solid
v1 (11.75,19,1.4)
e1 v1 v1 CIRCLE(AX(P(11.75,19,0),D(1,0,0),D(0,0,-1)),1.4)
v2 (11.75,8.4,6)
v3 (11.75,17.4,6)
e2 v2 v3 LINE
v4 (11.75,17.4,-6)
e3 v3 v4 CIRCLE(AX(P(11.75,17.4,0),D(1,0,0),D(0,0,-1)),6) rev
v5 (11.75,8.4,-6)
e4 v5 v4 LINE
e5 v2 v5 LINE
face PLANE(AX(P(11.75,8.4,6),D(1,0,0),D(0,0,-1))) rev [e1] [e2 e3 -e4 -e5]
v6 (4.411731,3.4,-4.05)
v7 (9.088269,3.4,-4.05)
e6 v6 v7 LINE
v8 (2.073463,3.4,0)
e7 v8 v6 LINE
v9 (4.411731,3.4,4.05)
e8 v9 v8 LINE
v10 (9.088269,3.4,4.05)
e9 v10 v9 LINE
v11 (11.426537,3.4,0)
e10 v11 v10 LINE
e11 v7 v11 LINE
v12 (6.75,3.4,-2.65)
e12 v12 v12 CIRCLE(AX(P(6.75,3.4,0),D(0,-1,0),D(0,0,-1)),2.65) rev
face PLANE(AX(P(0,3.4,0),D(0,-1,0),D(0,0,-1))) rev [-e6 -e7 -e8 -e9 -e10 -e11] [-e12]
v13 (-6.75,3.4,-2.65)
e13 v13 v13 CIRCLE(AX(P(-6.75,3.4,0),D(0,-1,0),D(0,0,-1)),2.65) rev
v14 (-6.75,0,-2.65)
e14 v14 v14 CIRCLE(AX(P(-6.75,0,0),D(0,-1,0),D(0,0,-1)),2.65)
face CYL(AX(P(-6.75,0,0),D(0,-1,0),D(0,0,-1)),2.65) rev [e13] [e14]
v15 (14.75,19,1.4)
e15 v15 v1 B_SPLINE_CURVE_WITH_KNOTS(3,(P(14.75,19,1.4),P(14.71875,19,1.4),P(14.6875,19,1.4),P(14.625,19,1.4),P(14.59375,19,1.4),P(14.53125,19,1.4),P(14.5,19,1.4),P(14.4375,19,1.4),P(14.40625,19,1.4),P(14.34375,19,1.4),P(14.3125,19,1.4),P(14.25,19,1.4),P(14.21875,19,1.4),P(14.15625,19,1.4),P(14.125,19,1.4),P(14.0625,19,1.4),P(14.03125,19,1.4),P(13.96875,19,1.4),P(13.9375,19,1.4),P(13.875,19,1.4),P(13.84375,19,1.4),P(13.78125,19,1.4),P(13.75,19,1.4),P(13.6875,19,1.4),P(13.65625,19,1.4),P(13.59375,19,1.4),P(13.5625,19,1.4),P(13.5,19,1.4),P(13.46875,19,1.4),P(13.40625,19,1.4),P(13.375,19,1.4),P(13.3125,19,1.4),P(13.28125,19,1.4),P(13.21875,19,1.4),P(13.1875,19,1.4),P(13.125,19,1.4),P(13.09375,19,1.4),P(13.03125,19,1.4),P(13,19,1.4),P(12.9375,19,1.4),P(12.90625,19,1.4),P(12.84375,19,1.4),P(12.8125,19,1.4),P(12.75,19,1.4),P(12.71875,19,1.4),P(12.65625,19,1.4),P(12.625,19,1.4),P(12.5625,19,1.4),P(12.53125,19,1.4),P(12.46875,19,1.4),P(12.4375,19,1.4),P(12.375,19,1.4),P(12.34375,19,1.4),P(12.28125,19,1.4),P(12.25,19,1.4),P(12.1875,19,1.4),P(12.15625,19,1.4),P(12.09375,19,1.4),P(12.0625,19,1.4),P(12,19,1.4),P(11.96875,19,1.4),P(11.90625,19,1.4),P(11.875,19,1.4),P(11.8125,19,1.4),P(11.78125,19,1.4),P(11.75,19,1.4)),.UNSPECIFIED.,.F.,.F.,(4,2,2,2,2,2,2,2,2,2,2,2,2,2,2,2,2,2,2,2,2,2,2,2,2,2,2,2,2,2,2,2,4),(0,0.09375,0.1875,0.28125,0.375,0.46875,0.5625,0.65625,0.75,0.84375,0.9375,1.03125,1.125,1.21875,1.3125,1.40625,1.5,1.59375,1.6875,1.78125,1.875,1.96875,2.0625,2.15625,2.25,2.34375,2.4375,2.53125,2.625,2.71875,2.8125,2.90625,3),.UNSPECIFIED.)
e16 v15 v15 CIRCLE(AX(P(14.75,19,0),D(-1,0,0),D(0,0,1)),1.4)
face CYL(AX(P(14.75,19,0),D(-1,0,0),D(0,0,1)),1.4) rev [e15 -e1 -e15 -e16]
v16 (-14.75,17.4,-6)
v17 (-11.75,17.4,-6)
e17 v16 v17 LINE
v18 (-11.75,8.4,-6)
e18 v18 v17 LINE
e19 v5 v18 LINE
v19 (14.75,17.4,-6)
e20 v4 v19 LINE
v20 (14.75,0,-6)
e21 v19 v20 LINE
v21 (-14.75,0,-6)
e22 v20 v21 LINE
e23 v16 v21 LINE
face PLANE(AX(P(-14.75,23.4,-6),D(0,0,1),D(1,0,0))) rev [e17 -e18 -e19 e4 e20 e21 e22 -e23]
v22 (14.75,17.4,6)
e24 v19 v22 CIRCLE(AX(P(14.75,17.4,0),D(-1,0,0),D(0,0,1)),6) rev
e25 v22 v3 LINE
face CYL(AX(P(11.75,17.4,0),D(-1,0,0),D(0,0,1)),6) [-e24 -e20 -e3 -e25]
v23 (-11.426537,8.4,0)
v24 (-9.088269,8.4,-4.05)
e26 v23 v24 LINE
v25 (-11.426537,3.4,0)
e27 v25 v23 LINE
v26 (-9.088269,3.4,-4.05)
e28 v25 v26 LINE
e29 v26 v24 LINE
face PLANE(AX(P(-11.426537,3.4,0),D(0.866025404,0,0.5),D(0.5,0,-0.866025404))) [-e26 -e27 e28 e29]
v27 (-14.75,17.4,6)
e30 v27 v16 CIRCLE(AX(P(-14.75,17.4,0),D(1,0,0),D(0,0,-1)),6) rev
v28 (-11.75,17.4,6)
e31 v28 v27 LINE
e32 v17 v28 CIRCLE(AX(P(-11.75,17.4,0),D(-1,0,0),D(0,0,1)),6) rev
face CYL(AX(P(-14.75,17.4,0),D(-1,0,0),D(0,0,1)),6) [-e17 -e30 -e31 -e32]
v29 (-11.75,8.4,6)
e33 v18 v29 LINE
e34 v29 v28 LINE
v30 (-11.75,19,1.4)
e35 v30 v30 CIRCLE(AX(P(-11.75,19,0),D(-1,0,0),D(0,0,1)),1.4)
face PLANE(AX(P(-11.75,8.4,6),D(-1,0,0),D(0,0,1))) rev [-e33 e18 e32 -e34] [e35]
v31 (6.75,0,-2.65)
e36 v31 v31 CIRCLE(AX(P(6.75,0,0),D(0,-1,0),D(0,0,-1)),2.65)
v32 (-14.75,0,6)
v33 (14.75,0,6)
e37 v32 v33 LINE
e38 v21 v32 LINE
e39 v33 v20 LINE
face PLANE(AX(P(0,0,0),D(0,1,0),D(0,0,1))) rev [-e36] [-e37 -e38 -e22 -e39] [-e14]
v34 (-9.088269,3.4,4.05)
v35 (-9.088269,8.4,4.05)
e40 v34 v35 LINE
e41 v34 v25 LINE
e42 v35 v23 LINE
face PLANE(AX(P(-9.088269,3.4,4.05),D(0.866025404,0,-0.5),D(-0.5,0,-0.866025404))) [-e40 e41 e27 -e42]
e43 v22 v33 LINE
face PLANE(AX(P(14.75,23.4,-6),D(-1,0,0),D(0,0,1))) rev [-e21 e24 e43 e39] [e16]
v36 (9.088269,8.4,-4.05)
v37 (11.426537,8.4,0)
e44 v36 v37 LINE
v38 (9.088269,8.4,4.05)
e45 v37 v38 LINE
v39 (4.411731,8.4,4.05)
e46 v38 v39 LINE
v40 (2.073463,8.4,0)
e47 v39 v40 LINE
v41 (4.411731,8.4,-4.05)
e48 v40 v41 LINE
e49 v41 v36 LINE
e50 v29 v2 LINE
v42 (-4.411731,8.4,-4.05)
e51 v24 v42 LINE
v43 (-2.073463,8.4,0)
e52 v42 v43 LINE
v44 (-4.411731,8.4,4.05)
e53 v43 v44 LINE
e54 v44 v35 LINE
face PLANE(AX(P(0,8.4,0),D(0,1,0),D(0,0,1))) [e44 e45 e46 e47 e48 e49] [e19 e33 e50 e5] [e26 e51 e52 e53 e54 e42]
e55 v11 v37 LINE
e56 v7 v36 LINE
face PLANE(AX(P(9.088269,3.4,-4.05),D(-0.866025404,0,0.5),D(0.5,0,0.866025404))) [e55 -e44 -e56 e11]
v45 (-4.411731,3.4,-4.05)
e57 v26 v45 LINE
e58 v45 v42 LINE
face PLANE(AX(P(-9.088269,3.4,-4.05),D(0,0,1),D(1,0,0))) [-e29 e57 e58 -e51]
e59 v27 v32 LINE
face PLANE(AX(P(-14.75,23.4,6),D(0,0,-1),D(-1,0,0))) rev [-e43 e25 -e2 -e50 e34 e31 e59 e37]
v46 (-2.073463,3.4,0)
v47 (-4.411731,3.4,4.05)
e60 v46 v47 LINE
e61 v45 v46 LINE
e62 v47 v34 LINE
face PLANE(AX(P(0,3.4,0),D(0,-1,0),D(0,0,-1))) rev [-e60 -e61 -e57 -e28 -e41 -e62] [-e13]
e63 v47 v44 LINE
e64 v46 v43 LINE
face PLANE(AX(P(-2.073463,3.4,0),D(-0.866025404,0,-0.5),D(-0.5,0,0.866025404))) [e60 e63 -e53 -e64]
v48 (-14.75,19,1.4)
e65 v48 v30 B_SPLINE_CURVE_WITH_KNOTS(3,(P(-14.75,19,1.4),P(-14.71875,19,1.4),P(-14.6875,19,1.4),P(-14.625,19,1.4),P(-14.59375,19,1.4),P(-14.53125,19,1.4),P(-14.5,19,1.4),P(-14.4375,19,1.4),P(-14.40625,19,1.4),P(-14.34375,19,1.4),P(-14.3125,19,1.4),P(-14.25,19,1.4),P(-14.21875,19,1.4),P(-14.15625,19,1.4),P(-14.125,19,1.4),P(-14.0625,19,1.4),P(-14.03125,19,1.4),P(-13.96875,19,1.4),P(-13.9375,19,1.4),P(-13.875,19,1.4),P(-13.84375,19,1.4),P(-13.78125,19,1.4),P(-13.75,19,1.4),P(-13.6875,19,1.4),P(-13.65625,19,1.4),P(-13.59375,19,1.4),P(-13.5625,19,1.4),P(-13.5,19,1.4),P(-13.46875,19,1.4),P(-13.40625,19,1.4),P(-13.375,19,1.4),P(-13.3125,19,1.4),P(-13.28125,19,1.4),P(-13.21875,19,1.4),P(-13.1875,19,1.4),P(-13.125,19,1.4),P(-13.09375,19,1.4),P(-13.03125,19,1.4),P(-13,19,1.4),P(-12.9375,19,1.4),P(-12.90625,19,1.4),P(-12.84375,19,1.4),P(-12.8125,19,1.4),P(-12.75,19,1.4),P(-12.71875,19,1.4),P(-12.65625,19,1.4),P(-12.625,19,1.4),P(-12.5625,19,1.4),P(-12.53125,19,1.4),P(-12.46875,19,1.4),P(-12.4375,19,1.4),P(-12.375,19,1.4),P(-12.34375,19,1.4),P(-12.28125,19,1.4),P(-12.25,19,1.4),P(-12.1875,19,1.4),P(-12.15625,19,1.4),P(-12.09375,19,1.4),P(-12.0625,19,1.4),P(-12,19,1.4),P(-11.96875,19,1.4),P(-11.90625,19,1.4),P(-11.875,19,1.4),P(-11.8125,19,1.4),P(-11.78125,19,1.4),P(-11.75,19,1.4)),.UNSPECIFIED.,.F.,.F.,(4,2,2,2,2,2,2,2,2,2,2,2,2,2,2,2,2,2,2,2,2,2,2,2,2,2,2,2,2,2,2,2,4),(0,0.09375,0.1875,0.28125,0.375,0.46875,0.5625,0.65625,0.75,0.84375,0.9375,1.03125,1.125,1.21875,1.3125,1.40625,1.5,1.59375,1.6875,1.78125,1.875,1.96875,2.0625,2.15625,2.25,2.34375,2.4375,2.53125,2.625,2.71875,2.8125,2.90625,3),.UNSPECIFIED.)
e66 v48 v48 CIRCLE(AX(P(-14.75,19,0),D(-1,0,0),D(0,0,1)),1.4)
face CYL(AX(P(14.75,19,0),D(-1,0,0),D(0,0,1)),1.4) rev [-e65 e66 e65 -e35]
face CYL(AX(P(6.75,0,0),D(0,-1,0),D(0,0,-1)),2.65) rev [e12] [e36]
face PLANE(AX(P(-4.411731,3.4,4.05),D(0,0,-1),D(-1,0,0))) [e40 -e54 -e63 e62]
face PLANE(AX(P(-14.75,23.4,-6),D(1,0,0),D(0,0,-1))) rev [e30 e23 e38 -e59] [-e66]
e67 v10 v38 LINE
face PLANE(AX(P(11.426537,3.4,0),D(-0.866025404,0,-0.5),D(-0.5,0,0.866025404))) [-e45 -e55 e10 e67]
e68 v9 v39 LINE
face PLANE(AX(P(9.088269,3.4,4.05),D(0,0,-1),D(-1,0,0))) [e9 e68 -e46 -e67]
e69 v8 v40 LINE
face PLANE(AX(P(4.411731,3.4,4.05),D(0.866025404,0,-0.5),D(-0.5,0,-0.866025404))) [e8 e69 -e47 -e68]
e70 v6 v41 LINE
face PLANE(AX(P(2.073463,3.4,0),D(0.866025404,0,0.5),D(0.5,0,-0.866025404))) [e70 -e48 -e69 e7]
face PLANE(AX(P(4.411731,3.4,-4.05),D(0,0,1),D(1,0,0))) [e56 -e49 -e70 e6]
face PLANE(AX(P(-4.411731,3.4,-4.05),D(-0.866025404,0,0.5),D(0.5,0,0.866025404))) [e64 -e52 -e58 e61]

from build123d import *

# Parameters (mm, degrees)
SKETCH_1_W          = 29.5
SKETCH_1_H          = 12
EXTRUDE_1_DEPTH     = 23.4
SKETCH_3_W          = 23.5
SKETCH_3_H          = 12
CUT_EXTRUDE_1_DEPTH = 15
SKETCH_4_R          = 1.4
CUT_EXTRUDE_2_DEPTH = 39.12886046
FILLET_1_RADIUS     = 6
FILLET_1_LENGTH     = 3
MIRROR_START        = 11.75
MIRROR_1_DEPTH      = 3
HOLE_WIZARD_M5_1_D  = 5.3
CUT_EXTRUDE_4_DEPTH = 5


# Read off the part's stored shape, not the designer's step: 镜向1
with BuildPart() as part:
    # 草图1 → 凸台-拉伸1 (new body)
    with BuildSketch(Plane(origin=(0, 0, 0), x_dir=(1, 0, 0), z_dir=(0, 1, 0))):
        Rectangle(SKETCH_1_W, SKETCH_1_H)
    extrude(amount=EXTRUDE_1_DEPTH)

    # 草图3 → 切除-拉伸1 (cut)
    with BuildSketch(Plane(origin=(0, 23.4, 0), x_dir=(1, 0, 0), z_dir=(0, 1, 0))):
        Rectangle(SKETCH_3_W, SKETCH_3_H)
    extrude(amount=-CUT_EXTRUDE_1_DEPTH, mode=Mode.SUBTRACT)

    # 草图4 → 切除-拉伸2 (cut, through all)
    with BuildSketch(Plane.ZY.offset(14.75)):
        with Locations((0, 19)):
            Circle(SKETCH_4_R)
    extrude(amount=-CUT_EXTRUDE_2_DEPTH, mode=Mode.SUBTRACT)

    # 圆角1: full round fillet: the end face becomes a half cylinder, R = half its width
    fillet_1_face = Plane((-13.25, 23.4, 0), x_dir=(-1, 0, 0), z_dir=(0, 1, 0))  # on the end face: x along it, z out of the body
    fillet_1_slab = fillet_1_face.offset(-FILLET_1_RADIUS / 2) * Box(FILLET_1_LENGTH, 2 * FILLET_1_RADIUS, FILLET_1_RADIUS, mode=Mode.PRIVATE)  # the body's end, R deep
    fillet_1_round = Plane((-13.25, 17.4, 0), x_dir=(0, 1, 0), z_dir=(-1, 0, 0)) * Cylinder(FILLET_1_RADIUS, FILLET_1_LENGTH, mode=Mode.PRIVATE)  # its axis R under the face
    add(fillet_1_slab - fillet_1_round, mode=Mode.SUBTRACT)

    # 镜向1 outline → 镜向1 (cut)
    with BuildSketch(Plane.YZ.offset(MIRROR_START)):
        with BuildLine():
            Line((23.4, 6), (17.4, 6))
            ThreePointArc((17.4, 6), (21.642640687, 4.242640687), (23.4, 0))
            Line((23.4, 0), (23.4, 6))
        make_face()
        with BuildLine():
            Line((23.4, -6), (23.4, 0))
            ThreePointArc((23.4, 0), (21.642640687, -4.242640687), (17.4, -6))
            Line((17.4, -6), (23.4, -6))
        make_face()
    extrude(amount=MIRROR_1_DEPTH, mode=Mode.SUBTRACT)

    # M5 间隙孔1 (through all)
    with Locations(Plane(origin=(0, 0, 0), x_dir=(-1, 0, 0), z_dir=(0, -1, 0))):
        with Locations((-6.75, 0), (6.75, 0)):
            Hole(HOLE_WIZARD_M5_1_D / 2)

    # 草图10 → 切除-拉伸4 (cut)
    with BuildSketch(Plane.XZ.offset(-8.4)):
        Polygon((2.07346282, 0), (4.41173141, -4.05), (9.08826859, -4.05), (11.42653718, 0), (9.08826859, 4.05), (4.41173141, 4.05), align=None)
        Polygon((-11.42653718, 0), (-9.08826859, -4.05), (-4.41173141, -4.05), (-2.07346282, 0), (-4.41173141, 4.05), (-9.08826859, 4.05), align=None)
    extrude(amount=CUT_EXTRUDE_4_DEPTH, mode=Mode.SUBTRACT)


solid = part.part
